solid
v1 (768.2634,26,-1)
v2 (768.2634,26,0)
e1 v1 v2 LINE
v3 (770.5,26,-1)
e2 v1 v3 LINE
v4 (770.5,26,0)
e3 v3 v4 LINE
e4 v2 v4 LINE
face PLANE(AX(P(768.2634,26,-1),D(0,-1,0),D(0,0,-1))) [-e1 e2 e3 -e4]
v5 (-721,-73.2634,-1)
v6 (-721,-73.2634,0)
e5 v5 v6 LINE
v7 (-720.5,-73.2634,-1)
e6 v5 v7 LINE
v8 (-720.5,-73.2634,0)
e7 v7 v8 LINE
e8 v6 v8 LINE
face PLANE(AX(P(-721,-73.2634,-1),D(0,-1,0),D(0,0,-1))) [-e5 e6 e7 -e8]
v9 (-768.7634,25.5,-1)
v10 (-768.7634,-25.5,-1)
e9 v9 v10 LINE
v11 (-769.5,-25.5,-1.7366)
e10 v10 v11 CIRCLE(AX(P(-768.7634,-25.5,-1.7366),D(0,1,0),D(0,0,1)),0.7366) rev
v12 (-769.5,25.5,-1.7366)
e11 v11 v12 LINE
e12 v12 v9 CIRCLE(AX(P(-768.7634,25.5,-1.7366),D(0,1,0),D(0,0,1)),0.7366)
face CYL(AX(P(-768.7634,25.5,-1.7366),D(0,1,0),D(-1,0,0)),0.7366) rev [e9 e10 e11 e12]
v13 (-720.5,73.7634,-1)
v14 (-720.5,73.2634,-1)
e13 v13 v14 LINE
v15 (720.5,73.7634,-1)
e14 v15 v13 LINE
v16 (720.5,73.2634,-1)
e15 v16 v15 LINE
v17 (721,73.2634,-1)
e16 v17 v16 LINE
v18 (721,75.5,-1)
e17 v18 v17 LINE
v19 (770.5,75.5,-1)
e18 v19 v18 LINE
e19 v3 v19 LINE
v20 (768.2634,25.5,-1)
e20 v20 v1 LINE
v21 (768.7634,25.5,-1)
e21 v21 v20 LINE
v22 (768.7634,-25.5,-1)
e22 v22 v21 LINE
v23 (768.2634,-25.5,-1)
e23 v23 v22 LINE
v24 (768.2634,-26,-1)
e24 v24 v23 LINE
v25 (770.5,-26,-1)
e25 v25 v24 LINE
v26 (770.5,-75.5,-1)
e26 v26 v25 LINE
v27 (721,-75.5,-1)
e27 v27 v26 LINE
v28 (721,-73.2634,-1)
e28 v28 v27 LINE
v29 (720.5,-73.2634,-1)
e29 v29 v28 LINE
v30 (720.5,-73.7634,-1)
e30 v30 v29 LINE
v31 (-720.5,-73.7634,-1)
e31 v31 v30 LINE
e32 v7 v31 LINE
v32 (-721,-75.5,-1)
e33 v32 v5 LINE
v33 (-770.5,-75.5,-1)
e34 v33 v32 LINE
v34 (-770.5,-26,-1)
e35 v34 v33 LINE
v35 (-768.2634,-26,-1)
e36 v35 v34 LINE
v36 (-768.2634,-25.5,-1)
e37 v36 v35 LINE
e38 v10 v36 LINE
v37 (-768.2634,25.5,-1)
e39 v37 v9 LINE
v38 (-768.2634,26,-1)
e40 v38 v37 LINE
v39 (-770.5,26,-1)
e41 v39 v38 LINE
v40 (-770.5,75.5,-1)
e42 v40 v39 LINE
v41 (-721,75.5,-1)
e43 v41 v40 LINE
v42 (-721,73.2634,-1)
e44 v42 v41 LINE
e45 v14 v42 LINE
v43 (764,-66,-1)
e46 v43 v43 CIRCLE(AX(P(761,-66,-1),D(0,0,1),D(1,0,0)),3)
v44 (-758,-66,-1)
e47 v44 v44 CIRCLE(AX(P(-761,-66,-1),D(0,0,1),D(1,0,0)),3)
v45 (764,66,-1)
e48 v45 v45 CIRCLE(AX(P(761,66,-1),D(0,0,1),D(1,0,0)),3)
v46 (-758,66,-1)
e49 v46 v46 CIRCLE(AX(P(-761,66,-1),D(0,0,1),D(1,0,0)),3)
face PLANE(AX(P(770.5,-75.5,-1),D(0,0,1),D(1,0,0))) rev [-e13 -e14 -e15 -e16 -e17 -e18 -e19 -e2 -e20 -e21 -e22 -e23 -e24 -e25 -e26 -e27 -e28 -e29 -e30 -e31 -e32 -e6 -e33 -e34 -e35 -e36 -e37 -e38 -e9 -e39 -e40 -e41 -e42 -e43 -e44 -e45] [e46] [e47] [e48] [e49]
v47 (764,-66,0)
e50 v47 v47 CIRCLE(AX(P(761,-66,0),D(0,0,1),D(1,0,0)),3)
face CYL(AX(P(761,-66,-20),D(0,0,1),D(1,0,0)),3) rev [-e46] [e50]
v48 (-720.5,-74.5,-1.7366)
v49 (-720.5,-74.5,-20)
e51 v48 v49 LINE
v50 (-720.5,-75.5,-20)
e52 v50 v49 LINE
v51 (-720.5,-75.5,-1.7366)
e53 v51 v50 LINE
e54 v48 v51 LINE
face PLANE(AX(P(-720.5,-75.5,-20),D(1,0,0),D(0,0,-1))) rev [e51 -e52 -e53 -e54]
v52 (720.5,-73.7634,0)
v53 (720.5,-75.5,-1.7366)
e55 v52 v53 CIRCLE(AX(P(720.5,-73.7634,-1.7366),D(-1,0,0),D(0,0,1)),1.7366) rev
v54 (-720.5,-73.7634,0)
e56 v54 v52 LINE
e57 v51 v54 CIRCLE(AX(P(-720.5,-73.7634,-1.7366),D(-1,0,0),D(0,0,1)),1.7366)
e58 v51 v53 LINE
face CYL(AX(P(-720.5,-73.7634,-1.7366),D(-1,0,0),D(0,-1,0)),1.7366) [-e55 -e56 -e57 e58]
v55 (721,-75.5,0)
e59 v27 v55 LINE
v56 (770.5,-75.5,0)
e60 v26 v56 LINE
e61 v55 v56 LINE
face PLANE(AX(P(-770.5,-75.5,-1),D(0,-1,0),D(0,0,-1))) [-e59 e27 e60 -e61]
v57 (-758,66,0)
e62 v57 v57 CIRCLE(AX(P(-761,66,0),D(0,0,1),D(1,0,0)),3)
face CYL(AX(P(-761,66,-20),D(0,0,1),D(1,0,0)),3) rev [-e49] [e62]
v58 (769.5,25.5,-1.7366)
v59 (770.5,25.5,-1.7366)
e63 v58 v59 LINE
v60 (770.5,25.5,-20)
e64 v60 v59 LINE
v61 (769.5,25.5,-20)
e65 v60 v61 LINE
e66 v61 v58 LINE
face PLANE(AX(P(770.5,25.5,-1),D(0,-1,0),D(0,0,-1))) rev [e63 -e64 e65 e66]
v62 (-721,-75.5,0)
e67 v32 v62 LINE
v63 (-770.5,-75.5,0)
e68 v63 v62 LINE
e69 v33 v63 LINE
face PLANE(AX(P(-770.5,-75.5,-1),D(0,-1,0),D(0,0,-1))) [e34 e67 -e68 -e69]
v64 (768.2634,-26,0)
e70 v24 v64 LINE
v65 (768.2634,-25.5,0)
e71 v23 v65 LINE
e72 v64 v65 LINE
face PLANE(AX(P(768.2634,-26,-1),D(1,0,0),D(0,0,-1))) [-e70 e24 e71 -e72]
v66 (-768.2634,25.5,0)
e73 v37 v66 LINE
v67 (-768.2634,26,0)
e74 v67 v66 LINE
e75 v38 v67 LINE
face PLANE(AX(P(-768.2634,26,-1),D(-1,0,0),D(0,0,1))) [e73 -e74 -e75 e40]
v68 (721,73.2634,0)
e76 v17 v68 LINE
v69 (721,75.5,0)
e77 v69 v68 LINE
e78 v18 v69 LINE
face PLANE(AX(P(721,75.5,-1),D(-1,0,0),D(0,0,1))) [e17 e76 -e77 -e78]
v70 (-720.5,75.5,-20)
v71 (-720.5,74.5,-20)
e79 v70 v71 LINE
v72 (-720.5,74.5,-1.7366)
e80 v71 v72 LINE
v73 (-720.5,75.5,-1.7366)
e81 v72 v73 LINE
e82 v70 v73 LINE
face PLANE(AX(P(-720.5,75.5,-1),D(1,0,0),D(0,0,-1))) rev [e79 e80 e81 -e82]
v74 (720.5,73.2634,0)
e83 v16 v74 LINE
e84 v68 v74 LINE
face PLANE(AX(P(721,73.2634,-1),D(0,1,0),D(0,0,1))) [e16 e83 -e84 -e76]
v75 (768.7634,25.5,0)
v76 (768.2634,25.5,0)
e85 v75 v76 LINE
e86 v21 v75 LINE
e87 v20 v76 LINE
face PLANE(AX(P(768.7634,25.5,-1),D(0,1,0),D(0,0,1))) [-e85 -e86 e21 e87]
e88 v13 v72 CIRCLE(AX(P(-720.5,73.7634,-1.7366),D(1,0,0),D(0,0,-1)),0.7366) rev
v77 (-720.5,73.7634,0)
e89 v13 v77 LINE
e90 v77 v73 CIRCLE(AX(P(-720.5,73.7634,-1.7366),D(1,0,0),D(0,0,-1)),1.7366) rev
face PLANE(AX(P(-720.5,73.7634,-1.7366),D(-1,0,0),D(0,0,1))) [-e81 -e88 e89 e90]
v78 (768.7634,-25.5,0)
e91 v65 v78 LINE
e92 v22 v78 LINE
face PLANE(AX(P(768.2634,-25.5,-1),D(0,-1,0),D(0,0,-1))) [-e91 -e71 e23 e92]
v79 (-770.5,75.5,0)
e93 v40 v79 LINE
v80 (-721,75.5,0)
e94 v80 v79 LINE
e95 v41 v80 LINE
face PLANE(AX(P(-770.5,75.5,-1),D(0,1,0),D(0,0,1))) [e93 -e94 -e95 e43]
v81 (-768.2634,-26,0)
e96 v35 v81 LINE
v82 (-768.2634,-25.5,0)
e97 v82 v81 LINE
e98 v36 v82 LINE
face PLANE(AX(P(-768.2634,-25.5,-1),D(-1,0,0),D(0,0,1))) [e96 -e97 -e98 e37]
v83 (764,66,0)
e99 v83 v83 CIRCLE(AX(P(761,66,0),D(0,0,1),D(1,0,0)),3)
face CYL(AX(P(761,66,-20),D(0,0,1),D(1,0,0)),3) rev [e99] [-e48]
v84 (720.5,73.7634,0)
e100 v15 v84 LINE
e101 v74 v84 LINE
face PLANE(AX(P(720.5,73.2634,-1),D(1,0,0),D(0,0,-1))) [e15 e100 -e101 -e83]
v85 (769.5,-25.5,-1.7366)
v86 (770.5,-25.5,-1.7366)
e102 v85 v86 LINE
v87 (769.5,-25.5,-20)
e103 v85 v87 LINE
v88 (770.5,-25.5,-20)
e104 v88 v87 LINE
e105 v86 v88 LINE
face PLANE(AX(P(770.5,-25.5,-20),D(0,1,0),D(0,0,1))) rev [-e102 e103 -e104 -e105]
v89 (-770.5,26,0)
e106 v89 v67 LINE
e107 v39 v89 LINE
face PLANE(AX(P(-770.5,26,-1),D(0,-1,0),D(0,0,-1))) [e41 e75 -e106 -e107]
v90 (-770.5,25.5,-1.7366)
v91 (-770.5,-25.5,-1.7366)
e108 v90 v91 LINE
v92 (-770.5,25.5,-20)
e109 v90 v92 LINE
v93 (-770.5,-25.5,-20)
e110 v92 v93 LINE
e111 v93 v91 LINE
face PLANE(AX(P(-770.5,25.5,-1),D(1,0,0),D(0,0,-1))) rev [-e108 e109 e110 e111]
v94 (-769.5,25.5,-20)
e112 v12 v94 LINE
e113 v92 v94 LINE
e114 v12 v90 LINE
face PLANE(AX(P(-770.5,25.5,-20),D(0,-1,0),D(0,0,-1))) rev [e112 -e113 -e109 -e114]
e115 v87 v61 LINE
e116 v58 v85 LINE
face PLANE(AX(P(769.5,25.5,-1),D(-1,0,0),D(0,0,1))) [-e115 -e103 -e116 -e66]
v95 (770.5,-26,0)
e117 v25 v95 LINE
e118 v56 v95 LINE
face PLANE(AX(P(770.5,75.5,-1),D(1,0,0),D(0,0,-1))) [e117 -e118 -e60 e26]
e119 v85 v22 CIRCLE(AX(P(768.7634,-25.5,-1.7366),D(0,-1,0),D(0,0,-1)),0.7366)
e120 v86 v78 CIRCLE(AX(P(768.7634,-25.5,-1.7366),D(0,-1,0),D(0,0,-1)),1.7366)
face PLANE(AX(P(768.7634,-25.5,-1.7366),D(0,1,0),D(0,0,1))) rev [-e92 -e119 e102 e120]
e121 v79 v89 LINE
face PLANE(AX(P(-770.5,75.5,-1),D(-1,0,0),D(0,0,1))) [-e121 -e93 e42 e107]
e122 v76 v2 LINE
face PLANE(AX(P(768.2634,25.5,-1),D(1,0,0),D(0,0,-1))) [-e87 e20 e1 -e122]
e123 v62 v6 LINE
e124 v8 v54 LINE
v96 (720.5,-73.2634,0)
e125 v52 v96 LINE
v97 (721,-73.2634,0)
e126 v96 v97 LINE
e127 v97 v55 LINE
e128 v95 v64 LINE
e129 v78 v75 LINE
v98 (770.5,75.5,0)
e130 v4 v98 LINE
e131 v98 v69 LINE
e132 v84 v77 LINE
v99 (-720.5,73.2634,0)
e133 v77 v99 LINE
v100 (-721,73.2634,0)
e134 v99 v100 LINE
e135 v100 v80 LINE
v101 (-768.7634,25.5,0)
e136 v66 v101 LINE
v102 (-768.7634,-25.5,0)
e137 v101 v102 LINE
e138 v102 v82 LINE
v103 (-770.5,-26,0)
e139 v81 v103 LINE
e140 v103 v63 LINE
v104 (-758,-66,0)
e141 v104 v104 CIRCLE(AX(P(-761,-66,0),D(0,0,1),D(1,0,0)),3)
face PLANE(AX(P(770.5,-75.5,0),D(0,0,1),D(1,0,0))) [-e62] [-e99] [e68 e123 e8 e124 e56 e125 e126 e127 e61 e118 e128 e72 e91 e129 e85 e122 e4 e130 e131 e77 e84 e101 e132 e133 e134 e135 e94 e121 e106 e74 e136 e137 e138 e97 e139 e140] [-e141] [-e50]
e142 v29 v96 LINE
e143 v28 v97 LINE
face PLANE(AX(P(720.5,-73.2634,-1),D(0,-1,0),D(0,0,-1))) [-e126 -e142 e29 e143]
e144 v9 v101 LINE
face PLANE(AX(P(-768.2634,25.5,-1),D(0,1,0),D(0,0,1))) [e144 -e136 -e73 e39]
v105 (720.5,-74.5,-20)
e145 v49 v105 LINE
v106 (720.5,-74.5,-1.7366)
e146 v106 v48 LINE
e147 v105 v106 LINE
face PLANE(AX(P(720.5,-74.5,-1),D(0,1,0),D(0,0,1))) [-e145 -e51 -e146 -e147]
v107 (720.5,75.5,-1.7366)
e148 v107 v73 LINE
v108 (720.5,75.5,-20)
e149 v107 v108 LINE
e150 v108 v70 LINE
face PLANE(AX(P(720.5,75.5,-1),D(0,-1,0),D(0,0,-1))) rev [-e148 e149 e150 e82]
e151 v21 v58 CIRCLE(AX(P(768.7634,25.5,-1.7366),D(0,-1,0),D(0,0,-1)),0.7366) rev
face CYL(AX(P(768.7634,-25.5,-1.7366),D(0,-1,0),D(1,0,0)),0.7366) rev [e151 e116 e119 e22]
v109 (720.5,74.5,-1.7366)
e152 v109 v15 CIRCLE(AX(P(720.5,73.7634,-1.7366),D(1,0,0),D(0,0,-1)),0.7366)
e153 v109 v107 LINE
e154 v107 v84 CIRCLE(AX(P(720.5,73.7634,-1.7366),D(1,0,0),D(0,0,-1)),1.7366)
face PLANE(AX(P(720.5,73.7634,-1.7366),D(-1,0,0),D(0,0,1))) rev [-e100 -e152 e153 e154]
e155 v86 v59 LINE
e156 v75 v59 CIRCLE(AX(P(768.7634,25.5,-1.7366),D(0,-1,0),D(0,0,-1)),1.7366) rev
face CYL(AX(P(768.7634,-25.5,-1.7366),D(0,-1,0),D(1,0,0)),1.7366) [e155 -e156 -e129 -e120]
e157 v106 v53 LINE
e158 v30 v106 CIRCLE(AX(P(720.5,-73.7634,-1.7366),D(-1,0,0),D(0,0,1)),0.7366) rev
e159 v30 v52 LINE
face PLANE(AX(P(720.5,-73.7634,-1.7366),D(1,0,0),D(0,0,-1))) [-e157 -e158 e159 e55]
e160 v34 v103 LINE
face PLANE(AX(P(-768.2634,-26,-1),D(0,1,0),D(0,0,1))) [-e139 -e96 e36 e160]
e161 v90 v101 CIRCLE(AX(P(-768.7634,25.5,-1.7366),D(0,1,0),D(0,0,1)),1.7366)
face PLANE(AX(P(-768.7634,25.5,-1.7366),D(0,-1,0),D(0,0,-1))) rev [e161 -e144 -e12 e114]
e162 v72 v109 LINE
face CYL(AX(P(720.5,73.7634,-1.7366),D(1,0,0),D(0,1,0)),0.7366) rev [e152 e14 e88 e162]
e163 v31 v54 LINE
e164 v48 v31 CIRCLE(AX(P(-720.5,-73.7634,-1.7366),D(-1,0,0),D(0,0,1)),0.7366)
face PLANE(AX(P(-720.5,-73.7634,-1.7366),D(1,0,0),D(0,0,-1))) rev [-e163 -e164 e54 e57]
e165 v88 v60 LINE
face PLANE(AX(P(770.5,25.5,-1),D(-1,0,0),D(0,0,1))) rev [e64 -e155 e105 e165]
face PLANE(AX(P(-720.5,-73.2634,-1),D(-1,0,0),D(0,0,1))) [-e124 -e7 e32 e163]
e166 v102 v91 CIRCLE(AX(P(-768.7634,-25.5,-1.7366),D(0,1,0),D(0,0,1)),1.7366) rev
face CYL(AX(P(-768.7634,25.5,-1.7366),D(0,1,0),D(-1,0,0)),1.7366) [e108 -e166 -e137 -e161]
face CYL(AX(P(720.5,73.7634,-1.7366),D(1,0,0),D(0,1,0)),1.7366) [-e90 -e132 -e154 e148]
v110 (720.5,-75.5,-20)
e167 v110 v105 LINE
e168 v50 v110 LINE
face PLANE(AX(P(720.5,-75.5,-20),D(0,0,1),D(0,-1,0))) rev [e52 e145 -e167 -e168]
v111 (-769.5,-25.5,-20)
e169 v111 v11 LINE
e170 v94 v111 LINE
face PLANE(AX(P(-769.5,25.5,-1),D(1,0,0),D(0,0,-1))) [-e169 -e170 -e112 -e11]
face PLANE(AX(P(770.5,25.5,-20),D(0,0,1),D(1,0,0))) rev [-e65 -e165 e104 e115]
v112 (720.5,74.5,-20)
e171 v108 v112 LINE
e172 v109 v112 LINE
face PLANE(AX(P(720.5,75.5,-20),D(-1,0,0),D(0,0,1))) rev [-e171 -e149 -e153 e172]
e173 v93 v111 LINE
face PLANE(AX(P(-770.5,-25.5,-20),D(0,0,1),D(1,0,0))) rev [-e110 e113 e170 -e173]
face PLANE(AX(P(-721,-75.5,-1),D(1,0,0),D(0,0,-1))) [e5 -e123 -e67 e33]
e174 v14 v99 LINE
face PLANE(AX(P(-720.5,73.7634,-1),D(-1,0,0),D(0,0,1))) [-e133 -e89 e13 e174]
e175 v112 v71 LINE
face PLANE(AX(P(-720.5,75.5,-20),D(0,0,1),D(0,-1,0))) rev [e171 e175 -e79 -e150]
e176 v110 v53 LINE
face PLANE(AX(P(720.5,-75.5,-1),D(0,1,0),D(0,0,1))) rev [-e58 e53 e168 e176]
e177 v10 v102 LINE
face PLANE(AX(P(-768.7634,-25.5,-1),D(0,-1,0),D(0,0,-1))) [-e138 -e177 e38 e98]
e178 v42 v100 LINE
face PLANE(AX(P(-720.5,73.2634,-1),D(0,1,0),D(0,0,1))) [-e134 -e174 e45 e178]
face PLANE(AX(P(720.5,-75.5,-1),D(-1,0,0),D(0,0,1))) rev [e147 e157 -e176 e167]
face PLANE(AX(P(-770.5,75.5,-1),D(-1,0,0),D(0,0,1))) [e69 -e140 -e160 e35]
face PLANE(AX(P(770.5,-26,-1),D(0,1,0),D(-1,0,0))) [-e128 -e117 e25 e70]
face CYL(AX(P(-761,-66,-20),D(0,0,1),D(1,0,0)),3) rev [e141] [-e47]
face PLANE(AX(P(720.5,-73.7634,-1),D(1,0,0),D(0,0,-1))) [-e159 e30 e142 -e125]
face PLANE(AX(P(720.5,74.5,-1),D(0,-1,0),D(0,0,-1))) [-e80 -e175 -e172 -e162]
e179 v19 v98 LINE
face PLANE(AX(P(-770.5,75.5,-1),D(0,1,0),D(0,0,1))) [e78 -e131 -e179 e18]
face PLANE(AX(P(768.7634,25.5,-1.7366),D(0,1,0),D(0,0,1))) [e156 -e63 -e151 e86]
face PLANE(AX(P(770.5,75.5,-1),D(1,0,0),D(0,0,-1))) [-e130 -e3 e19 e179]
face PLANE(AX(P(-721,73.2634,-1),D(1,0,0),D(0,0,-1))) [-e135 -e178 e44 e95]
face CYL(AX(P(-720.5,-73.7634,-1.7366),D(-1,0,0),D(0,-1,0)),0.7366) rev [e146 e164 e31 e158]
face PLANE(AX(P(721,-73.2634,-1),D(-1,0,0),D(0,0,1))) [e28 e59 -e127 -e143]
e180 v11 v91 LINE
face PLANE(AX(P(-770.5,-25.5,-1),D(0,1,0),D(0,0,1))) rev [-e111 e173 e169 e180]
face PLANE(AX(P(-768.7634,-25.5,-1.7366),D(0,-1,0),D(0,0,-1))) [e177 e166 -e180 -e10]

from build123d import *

# Parameters (mm, degrees)
SKETCH_1_W                        = 1541
SKETCH_1_H                        = 151
SM_BASE_FLANGE_1_DEPTH            = 1
SM_EDGE_FLANGE_1_STRIP_W          = 5.4732
SM_EDGE_FLANGE_1_STRIP_H          = 1
SM_EDGE_FLANGE_1_STRIP_CUT_DEPTH  = 1441
SM_EDGE_FLANGE_1_RELIEF_W         = 5.9732
SM_EDGE_FLANGE_1_RELIEF_H         = 0.5
SM_EDGE_FLANGE_1_RELIEF_CUT_DEPTH = 1
SM_EDGE_FLANGE_1_DEPTH            = 1441
SM_EDGE_FLANGE_2_STRIP_W          = 5.4732
SM_EDGE_FLANGE_2_STRIP_H          = 1
SM_EDGE_FLANGE_2_STRIP_CUT_DEPTH  = 1441
SM_EDGE_FLANGE_2_RELIEF_W         = 5.9732
SM_EDGE_FLANGE_2_RELIEF_H         = 0.5
SM_EDGE_FLANGE_2_RELIEF_CUT_DEPTH = 1
SM_EDGE_FLANGE_2_DEPTH            = 1441
SM_EDGE_FLANGE_3_STRIP_W          = 5.4732
SM_EDGE_FLANGE_3_STRIP_H          = 1
SM_EDGE_FLANGE_3_STRIP_CUT_DEPTH  = 51
SM_EDGE_FLANGE_3_RELIEF_W         = 5.9732
SM_EDGE_FLANGE_3_RELIEF_H         = 0.5
SM_EDGE_FLANGE_3_RELIEF_CUT_DEPTH = 1
SM_EDGE_FLANGE_3_DEPTH            = 51
SM_EDGE_FLANGE_4_STRIP_W          = 5.4732
SM_EDGE_FLANGE_4_STRIP_H          = 1
SM_EDGE_FLANGE_4_STRIP_CUT_DEPTH  = 51
SM_EDGE_FLANGE_4_RELIEF_W         = 5.9732
SM_EDGE_FLANGE_4_RELIEF_H         = 0.5
SM_EDGE_FLANGE_4_RELIEF_CUT_DEPTH = 1
SM_EDGE_FLANGE_4_DEPTH            = 51
SKETCH_15_R                       = 3
CUT_EXTRUDE_1_DEPTH               = 775.44851346


# Sheet-metal steps are written as plain solids
with BuildPart() as part:
    # Sketch 1 → 基体-法兰1 (new body)
    with BuildSketch(Plane.XY):
        Rectangle(SKETCH_1_W, SKETCH_1_H)
    extrude(amount=-SM_BASE_FLANGE_1_DEPTH)

    # 边线-法兰1 strip (across the edge) → 边线-法兰1 strip cut (cut)
    with BuildSketch(Plane(origin=(-720.5, 75.5, -1), x_dir=(0, -1, 0), z_dir=(1, 0, 0))):
        with Locations((-1, -0.5)):
            Rectangle(SM_EDGE_FLANGE_1_STRIP_W, SM_EDGE_FLANGE_1_STRIP_H)
    extrude(amount=SM_EDGE_FLANGE_1_STRIP_CUT_DEPTH, mode=Mode.SUBTRACT)

    # 边线-法兰1 relief (on the sheet) → 边线-法兰1 relief cut (cut)
    with BuildSketch(Plane(origin=(-720.5, 73.7634, -1), x_dir=(0, -1, 0), z_dir=(0, 0, -1))):
        with Locations((-2.4866, 0.25)):
            Rectangle(SM_EDGE_FLANGE_1_RELIEF_W, SM_EDGE_FLANGE_1_RELIEF_H)
        with Locations((-2.4866, -1441.25)):
            Rectangle(SM_EDGE_FLANGE_1_RELIEF_W, SM_EDGE_FLANGE_1_RELIEF_H)
    extrude(amount=-SM_EDGE_FLANGE_1_RELIEF_CUT_DEPTH, mode=Mode.SUBTRACT)

    # 边线-法兰1 section (across the edge) → 边线-法兰1 (add)
    with BuildSketch(Plane(origin=(-720.5, 75.5, -1), x_dir=(0, -1, 0), z_dir=(1, 0, 0))):
        with BuildLine():
            Line((0, 0.7366), (0, 19))
            Line((0, 19), (1, 19))
            Line((1, 19), (1, 0.7366))
            ThreePointArc((1, 0.7366), (1.215745145, 0.215745145), (1.7366, 0))
            Line((1.7366, 0), (1.7366, -1))
            ThreePointArc((1.7366, -1), (0.508638364, -0.491361636), (0, 0.7366))
        make_face()
    extrude(amount=SM_EDGE_FLANGE_1_DEPTH)

    # 边线-法兰2 strip (across the edge) → 边线-法兰2 strip cut (cut)
    with BuildSketch(Plane(origin=(720.5, -75.5, -1), x_dir=(0, 1, 0), z_dir=(-1, 0, 0))):
        with Locations((-1, -0.5)):
            Rectangle(SM_EDGE_FLANGE_2_STRIP_W, SM_EDGE_FLANGE_2_STRIP_H)
    extrude(amount=SM_EDGE_FLANGE_2_STRIP_CUT_DEPTH, mode=Mode.SUBTRACT)

    # 边线-法兰2 relief (on the sheet) → 边线-法兰2 relief cut (cut)
    with BuildSketch(Plane(origin=(720.5, -73.7634, -1), x_dir=(0, 1, 0), z_dir=(0, 0, -1))):
        with Locations((-2.4866, 0.25)):
            Rectangle(SM_EDGE_FLANGE_2_RELIEF_W, SM_EDGE_FLANGE_2_RELIEF_H)
        with Locations((-2.4866, -1441.25)):
            Rectangle(SM_EDGE_FLANGE_2_RELIEF_W, SM_EDGE_FLANGE_2_RELIEF_H)
    extrude(amount=-SM_EDGE_FLANGE_2_RELIEF_CUT_DEPTH, mode=Mode.SUBTRACT)

    # 边线-法兰2 section (across the edge) → 边线-法兰2 (add)
    with BuildSketch(Plane(origin=(720.5, -75.5, -1), x_dir=(0, 1, 0), z_dir=(-1, 0, 0))):
        with BuildLine():
            Line((0, 0.7366), (0, 19))
            Line((0, 19), (1, 19))
            Line((1, 19), (1, 0.7366))
            ThreePointArc((1, 0.7366), (1.215745145, 0.215745145), (1.7366, 0))
            Line((1.7366, 0), (1.7366, -1))
            ThreePointArc((1.7366, -1), (0.508638364, -0.491361636), (0, 0.7366))
        make_face()
    extrude(amount=SM_EDGE_FLANGE_2_DEPTH)

    # 边线-法兰3 strip (across the edge) → 边线-法兰3 strip cut (cut)
    with BuildSketch(Plane(origin=(770.5, 25.5, -1), x_dir=(-1, 0, 0), z_dir=(0, -1, 0))):
        with Locations((-1, -0.5)):
            Rectangle(SM_EDGE_FLANGE_3_STRIP_W, SM_EDGE_FLANGE_3_STRIP_H)
    extrude(amount=SM_EDGE_FLANGE_3_STRIP_CUT_DEPTH, mode=Mode.SUBTRACT)

    # 边线-法兰3 relief (on the sheet) → 边线-法兰3 relief cut (cut)
    with BuildSketch(Plane(origin=(768.7634, 25.5, -1), x_dir=(-1, 0, 0), z_dir=(0, 0, -1))):
        with Locations((-2.4866, 0.25)):
            Rectangle(SM_EDGE_FLANGE_3_RELIEF_W, SM_EDGE_FLANGE_3_RELIEF_H)
        with Locations((-2.4866, -51.25)):
            Rectangle(SM_EDGE_FLANGE_3_RELIEF_W, SM_EDGE_FLANGE_3_RELIEF_H)
    extrude(amount=-SM_EDGE_FLANGE_3_RELIEF_CUT_DEPTH, mode=Mode.SUBTRACT)

    # 边线-法兰3 section (across the edge) → 边线-法兰3 (add)
    with BuildSketch(Plane(origin=(770.5, 25.5, -1), x_dir=(-1, 0, 0), z_dir=(0, -1, 0))):
        with BuildLine():
            Line((0, 0.7366), (0, 19))
            Line((0, 19), (1, 19))
            Line((1, 19), (1, 0.7366))
            ThreePointArc((1, 0.7366), (1.215745145, 0.215745145), (1.7366, 0))
            Line((1.7366, 0), (1.7366, -1))
            ThreePointArc((1.7366, -1), (0.508638364, -0.491361636), (0, 0.7366))
        make_face()
    extrude(amount=SM_EDGE_FLANGE_3_DEPTH)

    # 边线-法兰4 strip (across the edge) → 边线-法兰4 strip cut (cut)
    with BuildSketch(Plane(origin=(-770.5, -25.5, -1), x_dir=(1, 0, 0), z_dir=(0, 1, 0))):
        with Locations((-1, -0.5)):
            Rectangle(SM_EDGE_FLANGE_4_STRIP_W, SM_EDGE_FLANGE_4_STRIP_H)
    extrude(amount=SM_EDGE_FLANGE_4_STRIP_CUT_DEPTH, mode=Mode.SUBTRACT)

    # 边线-法兰4 relief (on the sheet) → 边线-法兰4 relief cut (cut)
    with BuildSketch(Plane(origin=(-768.7634, -25.5, -1), x_dir=(1, 0, 0), z_dir=(0, 0, -1))):
        with Locations((-2.4866, 0.25)):
            Rectangle(SM_EDGE_FLANGE_4_RELIEF_W, SM_EDGE_FLANGE_4_RELIEF_H)
        with Locations((-2.4866, -51.25)):
            Rectangle(SM_EDGE_FLANGE_4_RELIEF_W, SM_EDGE_FLANGE_4_RELIEF_H)
    extrude(amount=-SM_EDGE_FLANGE_4_RELIEF_CUT_DEPTH, mode=Mode.SUBTRACT)

    # 边线-法兰4 section (across the edge) → 边线-法兰4 (add)
    with BuildSketch(Plane(origin=(-770.5, -25.5, -1), x_dir=(1, 0, 0), z_dir=(0, 1, 0))):
        with BuildLine():
            Line((0, 0.7366), (0, 19))
            Line((0, 19), (1, 19))
            Line((1, 19), (1, 0.7366))
            ThreePointArc((1, 0.7366), (1.215745145, 0.215745145), (1.7366, 0))
            Line((1.7366, 0), (1.7366, -1))
            ThreePointArc((1.7366, -1), (0.508638364, -0.491361636), (0, 0.7366))
        make_face()
    extrude(amount=SM_EDGE_FLANGE_4_DEPTH)

    # 草图15 → 切除-拉伸1 (cut, through all)
    with BuildSketch(Plane.XY):
        with Locations((761, 66)):
            Circle(SKETCH_15_R)
        with Locations((761, -66)):
            Circle(SKETCH_15_R)
        with Locations((-761, 66)):
            Circle(SKETCH_15_R)
        with Locations((-761, -66)):
            Circle(SKETCH_15_R)
    extrude(amount=-CUT_EXTRUDE_1_DEPTH, mode=Mode.SUBTRACT)


solid = part.part
